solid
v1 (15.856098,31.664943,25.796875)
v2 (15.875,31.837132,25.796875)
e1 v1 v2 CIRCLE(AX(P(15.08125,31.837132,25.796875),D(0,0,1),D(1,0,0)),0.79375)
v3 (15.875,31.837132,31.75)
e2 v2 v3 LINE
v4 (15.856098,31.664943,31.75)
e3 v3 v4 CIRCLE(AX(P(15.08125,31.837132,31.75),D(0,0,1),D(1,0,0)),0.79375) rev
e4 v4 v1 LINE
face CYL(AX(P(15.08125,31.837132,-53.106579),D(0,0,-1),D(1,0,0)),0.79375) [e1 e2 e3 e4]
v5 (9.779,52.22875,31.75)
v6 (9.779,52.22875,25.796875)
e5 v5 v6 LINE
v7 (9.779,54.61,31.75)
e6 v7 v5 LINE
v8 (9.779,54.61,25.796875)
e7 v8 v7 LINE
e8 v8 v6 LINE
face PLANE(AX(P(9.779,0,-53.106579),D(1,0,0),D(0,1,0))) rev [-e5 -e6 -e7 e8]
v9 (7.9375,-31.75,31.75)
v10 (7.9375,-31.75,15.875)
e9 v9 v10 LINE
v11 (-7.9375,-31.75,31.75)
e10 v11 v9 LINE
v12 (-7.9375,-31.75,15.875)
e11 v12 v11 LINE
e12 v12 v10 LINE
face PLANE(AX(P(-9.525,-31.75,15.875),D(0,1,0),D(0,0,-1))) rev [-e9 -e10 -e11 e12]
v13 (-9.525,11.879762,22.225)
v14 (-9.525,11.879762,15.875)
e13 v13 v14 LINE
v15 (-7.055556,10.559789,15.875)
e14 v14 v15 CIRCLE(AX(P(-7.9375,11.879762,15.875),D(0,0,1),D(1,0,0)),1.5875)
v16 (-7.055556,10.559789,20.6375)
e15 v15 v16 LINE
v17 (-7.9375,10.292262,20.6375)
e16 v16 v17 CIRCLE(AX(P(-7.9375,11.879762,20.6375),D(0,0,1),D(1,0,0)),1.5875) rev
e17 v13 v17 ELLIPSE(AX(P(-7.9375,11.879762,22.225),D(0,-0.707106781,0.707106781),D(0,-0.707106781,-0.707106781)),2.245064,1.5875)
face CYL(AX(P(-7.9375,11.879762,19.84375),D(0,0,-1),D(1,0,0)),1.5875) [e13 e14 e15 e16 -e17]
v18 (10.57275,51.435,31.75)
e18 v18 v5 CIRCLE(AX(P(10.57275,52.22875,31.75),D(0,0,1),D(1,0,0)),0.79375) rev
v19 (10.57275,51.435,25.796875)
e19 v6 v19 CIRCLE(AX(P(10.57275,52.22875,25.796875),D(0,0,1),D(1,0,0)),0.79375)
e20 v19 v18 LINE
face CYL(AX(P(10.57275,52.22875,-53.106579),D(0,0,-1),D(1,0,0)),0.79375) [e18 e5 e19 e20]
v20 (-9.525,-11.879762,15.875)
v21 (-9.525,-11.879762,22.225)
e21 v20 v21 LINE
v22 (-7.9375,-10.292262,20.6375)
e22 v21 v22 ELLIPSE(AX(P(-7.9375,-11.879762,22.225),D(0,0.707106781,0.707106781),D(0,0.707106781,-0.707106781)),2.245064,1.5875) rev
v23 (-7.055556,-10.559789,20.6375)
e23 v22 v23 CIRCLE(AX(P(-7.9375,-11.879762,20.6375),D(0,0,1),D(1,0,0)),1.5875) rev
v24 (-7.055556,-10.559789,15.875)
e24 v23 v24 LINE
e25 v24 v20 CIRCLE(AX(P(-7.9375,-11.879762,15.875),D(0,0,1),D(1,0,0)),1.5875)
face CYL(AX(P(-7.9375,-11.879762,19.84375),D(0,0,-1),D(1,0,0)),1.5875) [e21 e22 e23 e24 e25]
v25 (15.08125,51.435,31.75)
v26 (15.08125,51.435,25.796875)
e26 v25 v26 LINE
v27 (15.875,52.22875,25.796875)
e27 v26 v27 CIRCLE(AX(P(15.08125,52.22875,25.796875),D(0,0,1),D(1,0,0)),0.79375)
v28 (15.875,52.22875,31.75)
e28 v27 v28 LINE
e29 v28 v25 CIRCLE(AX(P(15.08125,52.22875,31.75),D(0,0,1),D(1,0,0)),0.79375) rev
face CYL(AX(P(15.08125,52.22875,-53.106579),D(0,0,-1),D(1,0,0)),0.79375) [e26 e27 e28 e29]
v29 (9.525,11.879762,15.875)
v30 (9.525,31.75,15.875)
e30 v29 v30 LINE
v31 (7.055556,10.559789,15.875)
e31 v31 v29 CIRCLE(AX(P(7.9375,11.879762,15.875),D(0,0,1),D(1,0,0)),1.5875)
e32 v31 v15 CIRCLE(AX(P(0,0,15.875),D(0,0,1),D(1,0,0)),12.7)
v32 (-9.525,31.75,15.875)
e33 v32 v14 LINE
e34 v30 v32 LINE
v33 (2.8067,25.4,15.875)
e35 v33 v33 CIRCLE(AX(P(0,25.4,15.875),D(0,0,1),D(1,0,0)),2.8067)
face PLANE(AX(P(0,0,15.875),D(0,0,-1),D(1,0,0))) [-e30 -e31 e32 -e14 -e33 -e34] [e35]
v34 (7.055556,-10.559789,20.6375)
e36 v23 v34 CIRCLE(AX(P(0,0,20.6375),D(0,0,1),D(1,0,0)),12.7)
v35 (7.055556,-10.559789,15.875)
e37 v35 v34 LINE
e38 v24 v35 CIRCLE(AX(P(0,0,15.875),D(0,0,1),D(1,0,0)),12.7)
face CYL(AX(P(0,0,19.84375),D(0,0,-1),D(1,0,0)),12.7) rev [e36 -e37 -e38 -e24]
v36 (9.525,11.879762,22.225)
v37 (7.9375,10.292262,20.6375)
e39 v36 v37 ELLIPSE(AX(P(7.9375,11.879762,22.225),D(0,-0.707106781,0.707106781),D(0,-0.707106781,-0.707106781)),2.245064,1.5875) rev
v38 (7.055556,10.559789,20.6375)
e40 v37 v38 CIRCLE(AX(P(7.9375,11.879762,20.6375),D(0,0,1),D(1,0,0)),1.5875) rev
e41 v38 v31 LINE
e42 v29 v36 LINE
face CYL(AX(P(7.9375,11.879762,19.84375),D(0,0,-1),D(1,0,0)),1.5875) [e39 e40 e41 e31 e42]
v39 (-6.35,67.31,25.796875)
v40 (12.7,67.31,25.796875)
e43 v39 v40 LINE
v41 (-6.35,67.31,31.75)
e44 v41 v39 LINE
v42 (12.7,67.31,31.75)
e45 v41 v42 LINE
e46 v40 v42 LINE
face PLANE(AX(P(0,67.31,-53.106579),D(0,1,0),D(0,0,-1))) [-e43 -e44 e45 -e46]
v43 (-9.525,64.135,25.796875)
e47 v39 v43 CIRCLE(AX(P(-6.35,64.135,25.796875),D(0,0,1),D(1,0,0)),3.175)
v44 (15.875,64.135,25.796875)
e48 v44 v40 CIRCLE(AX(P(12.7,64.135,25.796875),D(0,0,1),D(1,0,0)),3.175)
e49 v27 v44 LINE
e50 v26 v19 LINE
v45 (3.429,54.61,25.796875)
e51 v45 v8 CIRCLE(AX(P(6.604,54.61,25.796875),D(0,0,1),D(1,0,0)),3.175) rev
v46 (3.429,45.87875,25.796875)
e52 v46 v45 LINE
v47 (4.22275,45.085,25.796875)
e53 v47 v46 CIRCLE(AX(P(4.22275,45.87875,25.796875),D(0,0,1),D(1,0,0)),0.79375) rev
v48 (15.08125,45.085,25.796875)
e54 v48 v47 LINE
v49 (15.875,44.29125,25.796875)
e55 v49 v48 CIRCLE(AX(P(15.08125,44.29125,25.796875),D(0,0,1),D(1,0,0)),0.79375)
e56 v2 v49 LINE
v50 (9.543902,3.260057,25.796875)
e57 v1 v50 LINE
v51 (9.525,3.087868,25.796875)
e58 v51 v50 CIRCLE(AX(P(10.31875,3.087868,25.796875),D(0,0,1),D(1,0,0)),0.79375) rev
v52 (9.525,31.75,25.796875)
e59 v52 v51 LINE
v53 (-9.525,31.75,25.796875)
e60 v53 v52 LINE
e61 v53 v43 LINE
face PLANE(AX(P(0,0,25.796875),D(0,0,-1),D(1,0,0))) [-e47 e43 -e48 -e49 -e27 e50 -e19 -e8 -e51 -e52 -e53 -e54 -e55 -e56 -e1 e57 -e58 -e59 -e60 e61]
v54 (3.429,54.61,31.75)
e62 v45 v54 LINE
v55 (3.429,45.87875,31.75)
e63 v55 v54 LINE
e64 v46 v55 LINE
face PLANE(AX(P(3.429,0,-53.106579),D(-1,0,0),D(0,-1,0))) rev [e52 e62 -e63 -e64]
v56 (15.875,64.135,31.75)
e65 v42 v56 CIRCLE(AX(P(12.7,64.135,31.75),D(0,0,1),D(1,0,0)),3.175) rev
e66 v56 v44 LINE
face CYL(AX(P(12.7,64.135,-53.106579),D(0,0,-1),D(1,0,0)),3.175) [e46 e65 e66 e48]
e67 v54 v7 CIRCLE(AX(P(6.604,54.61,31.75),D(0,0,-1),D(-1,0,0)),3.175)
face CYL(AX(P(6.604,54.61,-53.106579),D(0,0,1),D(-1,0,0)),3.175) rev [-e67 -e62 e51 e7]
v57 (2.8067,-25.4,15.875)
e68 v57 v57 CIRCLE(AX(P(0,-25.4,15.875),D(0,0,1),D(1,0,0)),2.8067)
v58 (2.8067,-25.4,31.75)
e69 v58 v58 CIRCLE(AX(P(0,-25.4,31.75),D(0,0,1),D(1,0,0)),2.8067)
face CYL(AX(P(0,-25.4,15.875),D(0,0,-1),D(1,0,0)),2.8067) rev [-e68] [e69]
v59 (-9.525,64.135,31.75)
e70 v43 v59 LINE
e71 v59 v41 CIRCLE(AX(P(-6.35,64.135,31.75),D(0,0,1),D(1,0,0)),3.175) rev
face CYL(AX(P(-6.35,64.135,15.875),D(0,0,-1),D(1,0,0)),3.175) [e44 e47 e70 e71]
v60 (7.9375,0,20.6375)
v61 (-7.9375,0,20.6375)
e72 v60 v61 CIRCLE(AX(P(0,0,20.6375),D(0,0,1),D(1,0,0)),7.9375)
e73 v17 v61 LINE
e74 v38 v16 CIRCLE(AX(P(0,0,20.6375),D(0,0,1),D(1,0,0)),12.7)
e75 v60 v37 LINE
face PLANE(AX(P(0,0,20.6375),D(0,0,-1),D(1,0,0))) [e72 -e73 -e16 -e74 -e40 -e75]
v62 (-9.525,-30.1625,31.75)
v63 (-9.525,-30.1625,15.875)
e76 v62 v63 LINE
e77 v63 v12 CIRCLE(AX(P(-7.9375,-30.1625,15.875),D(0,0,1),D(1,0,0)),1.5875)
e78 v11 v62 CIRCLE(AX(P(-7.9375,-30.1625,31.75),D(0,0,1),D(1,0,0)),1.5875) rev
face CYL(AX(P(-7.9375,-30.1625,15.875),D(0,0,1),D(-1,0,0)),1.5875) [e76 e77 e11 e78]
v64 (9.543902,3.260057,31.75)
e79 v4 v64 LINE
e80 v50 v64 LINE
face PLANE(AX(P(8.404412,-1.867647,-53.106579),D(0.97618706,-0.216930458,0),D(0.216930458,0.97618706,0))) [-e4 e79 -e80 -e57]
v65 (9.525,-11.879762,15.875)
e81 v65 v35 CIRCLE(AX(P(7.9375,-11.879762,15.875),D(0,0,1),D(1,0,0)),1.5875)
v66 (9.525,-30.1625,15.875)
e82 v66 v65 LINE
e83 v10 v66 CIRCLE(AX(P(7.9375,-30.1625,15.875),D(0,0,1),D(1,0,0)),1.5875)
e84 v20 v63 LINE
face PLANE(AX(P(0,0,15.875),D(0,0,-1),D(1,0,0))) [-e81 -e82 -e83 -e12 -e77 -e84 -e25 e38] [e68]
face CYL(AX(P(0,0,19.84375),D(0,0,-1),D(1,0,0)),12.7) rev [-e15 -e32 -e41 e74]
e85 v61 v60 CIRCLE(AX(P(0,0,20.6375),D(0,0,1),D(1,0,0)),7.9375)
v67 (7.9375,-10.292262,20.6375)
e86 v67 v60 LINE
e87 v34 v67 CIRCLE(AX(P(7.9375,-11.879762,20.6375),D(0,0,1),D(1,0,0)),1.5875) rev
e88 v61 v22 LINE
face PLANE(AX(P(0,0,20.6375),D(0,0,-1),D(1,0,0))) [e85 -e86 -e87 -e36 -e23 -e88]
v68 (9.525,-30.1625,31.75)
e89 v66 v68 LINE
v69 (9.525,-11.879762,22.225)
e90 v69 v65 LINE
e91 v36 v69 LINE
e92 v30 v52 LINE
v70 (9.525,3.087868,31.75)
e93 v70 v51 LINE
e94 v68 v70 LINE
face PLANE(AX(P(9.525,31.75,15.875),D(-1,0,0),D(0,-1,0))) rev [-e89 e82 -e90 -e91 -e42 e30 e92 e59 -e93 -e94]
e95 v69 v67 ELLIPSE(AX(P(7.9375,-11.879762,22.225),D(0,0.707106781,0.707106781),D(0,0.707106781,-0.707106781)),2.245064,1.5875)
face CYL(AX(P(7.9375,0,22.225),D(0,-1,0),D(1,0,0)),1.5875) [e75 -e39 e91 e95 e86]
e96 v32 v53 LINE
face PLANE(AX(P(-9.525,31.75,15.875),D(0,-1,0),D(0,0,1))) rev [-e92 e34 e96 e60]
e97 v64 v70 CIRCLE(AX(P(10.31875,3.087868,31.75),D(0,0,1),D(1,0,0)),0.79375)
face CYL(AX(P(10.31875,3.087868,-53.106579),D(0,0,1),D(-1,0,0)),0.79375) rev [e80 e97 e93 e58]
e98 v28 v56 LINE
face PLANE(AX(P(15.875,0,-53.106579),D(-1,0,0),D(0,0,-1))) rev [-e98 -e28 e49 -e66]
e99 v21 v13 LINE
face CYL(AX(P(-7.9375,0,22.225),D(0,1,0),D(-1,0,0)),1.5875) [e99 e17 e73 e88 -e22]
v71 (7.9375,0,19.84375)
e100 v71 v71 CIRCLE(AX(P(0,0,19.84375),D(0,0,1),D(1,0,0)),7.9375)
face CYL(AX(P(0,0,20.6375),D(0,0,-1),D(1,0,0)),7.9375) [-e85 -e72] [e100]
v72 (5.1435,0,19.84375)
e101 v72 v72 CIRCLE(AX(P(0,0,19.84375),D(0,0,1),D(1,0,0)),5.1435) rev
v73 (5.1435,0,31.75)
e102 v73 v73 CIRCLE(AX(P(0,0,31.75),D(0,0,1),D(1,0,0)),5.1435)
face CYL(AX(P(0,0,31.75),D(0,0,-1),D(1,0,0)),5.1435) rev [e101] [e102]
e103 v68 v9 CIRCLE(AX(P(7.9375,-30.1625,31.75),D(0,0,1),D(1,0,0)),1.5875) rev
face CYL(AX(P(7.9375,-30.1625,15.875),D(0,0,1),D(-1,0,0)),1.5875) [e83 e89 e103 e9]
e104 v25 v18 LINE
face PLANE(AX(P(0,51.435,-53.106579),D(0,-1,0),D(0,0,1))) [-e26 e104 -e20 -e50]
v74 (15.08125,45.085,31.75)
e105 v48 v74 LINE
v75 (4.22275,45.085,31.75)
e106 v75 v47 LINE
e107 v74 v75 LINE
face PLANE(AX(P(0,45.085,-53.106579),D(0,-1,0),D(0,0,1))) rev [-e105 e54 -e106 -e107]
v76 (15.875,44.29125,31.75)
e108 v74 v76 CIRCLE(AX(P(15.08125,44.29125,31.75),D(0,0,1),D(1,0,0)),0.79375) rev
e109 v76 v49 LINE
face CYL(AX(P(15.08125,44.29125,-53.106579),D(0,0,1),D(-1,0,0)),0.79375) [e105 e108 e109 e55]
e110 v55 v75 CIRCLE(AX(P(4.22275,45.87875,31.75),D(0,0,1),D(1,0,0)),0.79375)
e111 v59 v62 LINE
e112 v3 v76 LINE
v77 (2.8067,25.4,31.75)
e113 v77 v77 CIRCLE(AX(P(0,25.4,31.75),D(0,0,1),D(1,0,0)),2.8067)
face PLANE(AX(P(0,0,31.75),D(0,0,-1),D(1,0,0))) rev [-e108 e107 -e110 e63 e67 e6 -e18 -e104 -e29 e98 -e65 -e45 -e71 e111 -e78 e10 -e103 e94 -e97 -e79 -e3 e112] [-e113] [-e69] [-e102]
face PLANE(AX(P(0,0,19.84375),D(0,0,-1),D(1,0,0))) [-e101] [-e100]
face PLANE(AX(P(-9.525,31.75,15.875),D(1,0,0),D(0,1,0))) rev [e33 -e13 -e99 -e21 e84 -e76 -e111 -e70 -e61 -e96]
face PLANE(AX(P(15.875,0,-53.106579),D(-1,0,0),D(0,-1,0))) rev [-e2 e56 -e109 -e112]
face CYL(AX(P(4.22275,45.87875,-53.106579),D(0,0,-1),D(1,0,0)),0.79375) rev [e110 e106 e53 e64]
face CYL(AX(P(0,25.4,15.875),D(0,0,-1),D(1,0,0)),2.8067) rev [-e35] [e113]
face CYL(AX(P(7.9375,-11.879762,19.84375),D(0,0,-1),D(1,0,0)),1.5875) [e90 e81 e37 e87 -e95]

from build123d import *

# Parameters (mm, degrees)
SKETCH1_W                  = 19.05
SKETCH1_H                  = 63.5
BOSS_EXTRUDE1_DEPTH        = 15.875
SKETCH2_R                  = 5.1435
CUT_EXTRUDE1_DEPTH         = 37.753282166
SKETCH3_R                  = 12.7
CUT_EXTRUDE2_DEPTH         = 3.96875
SKETCH4_R                  = 12.7
SKETCH4_R_2                = 7.9375
CUT_EXTRUDE3_DEPTH         = 0.79375
F_10_CLEARANCE_HOLE1_D     = 5.6134
F_10_CLEARANCE_HOLE1_DEPTH = 25.4
F_10_CLEARANCE_HOLE1_TIP   = 1.686435499
FILLET1_R                  = 1.5875
BOSS_EXTRUDE2_DEPTH        = 5.953125
FILLET3_R                  = 0.79375
FILLET4_R                  = 3.175


with BuildPart() as part:
    # Sketch1 → Boss-Extrude1 (new body)
    with BuildSketch(Plane.XY):
        Rectangle(SKETCH1_W, SKETCH1_H)
    extrude(amount=BOSS_EXTRUDE1_DEPTH)

    # Sketch2 → Cut-Extrude1 (cut, through all)
    with BuildSketch(Plane.XY.offset(15.875)):
        Circle(SKETCH2_R)
    extrude(amount=-CUT_EXTRUDE1_DEPTH, mode=Mode.SUBTRACT)

    # Sketch3 → Cut-Extrude2 (cut)
    with BuildSketch(Plane.XY.offset(15.875)):
        Circle(SKETCH3_R)
    extrude(amount=-CUT_EXTRUDE2_DEPTH, mode=Mode.SUBTRACT)

    # Sketch4 → Cut-Extrude3 (cut)
    with BuildSketch(Plane.XY.offset(11.90625)):
        Circle(SKETCH4_R)
        Circle(SKETCH4_R_2, mode=Mode.SUBTRACT)
    extrude(amount=-CUT_EXTRUDE3_DEPTH, mode=Mode.SUBTRACT)

    # #10 Clearance Hole1
    with Locations(Plane.XY.offset(15.875)):
        with Locations((0, 25.4), (0, -25.4)):
            Hole(F_10_CLEARANCE_HOLE1_D / 2, depth=F_10_CLEARANCE_HOLE1_DEPTH)
            with Locations((0, 0, -(F_10_CLEARANCE_HOLE1_DEPTH + F_10_CLEARANCE_HOLE1_TIP / 2))):  # 118° drill point
                Cone(0, F_10_CLEARANCE_HOLE1_D / 2, F_10_CLEARANCE_HOLE1_TIP, mode=Mode.SUBTRACT)

    # Fillet1
    fillet1_edges = [part.edges().sort_by_distance(p)[0] for p in [
        (9.525, -8.400260413, 13.49375),
        (-9.525, -8.400260413, 13.49375),
        (9.525, 8.400260413, 13.49375),
        (-9.525, 8.400260413, 13.49375),
        (-9.525, 0, 11.1125),
        (9.525, 0, 11.1125),
        (9.525, -31.75, 7.9375),
        (-9.525, -31.75, 7.9375),
    ]]
    fillet(fillet1_edges, radius=FILLET1_R - 0.0001)  # a hair under: the kernel refuses the full size

    # Sketch12 → Boss-Extrude2 (add)
    with BuildSketch(Plane(origin=(0, 0, 0), x_dir=(-1, 0, 0), z_dir=(0, 0, -1))):
        with BuildLine():
            Line((-15.875, 67.31), (-15.875, 51.435))
            Line((-15.875, 51.435), (-9.779, 51.435))
            Line((-9.779, 51.435), (-9.779, 54.61))
            ThreePointArc((-9.779, 54.61), (-6.604, 57.785), (-3.429, 54.61))
            Line((-3.429, 54.61), (-3.429, 45.085))
            Line((-3.429, 45.085), (-15.875, 45.085))
            Line((-15.875, 45.085), (-15.875, 31.75))
            Line((-15.875, 31.75), (-9.525, 3.175))
            Line((-9.525, 3.175), (-9.525, 31.75))
            Line((-9.525, 31.75), (9.525, 31.75))
            Line((9.525, 31.75), (9.525, 67.31))
            Line((9.525, 67.31), (-15.875, 67.31))
        make_face()
    extrude(amount=-BOSS_EXTRUDE2_DEPTH)

    # Fillet3
    fillet3_edges = [part.edges().sort_by_distance(p)[0] for p in [
        (9.779, 51.435, 2.9765625),
        (15.875, 51.435, 2.9765625),
        (9.525, 3.175, 2.9765625),
        (15.875, 31.75, 2.9765625),
        (15.875, 45.085, 2.9765625),
        (3.429, 45.085, 2.9765625),
    ]]
    fillet(fillet3_edges, radius=FILLET3_R)

    # Fillet4
    fillet4_edges = [part.edges().sort_by_distance(p)[0] for p in [
        (15.875, 67.31, 2.9765625),
        (-9.525, 67.31, 2.9765625),
    ]]
    fillet(fillet4_edges, radius=FILLET4_R)


with BuildPart() as body_2:
    # Mirror1: mirrored copy
    add(part.part.mirror(Plane.XY.offset(15.875)))


solid = body_2.part
